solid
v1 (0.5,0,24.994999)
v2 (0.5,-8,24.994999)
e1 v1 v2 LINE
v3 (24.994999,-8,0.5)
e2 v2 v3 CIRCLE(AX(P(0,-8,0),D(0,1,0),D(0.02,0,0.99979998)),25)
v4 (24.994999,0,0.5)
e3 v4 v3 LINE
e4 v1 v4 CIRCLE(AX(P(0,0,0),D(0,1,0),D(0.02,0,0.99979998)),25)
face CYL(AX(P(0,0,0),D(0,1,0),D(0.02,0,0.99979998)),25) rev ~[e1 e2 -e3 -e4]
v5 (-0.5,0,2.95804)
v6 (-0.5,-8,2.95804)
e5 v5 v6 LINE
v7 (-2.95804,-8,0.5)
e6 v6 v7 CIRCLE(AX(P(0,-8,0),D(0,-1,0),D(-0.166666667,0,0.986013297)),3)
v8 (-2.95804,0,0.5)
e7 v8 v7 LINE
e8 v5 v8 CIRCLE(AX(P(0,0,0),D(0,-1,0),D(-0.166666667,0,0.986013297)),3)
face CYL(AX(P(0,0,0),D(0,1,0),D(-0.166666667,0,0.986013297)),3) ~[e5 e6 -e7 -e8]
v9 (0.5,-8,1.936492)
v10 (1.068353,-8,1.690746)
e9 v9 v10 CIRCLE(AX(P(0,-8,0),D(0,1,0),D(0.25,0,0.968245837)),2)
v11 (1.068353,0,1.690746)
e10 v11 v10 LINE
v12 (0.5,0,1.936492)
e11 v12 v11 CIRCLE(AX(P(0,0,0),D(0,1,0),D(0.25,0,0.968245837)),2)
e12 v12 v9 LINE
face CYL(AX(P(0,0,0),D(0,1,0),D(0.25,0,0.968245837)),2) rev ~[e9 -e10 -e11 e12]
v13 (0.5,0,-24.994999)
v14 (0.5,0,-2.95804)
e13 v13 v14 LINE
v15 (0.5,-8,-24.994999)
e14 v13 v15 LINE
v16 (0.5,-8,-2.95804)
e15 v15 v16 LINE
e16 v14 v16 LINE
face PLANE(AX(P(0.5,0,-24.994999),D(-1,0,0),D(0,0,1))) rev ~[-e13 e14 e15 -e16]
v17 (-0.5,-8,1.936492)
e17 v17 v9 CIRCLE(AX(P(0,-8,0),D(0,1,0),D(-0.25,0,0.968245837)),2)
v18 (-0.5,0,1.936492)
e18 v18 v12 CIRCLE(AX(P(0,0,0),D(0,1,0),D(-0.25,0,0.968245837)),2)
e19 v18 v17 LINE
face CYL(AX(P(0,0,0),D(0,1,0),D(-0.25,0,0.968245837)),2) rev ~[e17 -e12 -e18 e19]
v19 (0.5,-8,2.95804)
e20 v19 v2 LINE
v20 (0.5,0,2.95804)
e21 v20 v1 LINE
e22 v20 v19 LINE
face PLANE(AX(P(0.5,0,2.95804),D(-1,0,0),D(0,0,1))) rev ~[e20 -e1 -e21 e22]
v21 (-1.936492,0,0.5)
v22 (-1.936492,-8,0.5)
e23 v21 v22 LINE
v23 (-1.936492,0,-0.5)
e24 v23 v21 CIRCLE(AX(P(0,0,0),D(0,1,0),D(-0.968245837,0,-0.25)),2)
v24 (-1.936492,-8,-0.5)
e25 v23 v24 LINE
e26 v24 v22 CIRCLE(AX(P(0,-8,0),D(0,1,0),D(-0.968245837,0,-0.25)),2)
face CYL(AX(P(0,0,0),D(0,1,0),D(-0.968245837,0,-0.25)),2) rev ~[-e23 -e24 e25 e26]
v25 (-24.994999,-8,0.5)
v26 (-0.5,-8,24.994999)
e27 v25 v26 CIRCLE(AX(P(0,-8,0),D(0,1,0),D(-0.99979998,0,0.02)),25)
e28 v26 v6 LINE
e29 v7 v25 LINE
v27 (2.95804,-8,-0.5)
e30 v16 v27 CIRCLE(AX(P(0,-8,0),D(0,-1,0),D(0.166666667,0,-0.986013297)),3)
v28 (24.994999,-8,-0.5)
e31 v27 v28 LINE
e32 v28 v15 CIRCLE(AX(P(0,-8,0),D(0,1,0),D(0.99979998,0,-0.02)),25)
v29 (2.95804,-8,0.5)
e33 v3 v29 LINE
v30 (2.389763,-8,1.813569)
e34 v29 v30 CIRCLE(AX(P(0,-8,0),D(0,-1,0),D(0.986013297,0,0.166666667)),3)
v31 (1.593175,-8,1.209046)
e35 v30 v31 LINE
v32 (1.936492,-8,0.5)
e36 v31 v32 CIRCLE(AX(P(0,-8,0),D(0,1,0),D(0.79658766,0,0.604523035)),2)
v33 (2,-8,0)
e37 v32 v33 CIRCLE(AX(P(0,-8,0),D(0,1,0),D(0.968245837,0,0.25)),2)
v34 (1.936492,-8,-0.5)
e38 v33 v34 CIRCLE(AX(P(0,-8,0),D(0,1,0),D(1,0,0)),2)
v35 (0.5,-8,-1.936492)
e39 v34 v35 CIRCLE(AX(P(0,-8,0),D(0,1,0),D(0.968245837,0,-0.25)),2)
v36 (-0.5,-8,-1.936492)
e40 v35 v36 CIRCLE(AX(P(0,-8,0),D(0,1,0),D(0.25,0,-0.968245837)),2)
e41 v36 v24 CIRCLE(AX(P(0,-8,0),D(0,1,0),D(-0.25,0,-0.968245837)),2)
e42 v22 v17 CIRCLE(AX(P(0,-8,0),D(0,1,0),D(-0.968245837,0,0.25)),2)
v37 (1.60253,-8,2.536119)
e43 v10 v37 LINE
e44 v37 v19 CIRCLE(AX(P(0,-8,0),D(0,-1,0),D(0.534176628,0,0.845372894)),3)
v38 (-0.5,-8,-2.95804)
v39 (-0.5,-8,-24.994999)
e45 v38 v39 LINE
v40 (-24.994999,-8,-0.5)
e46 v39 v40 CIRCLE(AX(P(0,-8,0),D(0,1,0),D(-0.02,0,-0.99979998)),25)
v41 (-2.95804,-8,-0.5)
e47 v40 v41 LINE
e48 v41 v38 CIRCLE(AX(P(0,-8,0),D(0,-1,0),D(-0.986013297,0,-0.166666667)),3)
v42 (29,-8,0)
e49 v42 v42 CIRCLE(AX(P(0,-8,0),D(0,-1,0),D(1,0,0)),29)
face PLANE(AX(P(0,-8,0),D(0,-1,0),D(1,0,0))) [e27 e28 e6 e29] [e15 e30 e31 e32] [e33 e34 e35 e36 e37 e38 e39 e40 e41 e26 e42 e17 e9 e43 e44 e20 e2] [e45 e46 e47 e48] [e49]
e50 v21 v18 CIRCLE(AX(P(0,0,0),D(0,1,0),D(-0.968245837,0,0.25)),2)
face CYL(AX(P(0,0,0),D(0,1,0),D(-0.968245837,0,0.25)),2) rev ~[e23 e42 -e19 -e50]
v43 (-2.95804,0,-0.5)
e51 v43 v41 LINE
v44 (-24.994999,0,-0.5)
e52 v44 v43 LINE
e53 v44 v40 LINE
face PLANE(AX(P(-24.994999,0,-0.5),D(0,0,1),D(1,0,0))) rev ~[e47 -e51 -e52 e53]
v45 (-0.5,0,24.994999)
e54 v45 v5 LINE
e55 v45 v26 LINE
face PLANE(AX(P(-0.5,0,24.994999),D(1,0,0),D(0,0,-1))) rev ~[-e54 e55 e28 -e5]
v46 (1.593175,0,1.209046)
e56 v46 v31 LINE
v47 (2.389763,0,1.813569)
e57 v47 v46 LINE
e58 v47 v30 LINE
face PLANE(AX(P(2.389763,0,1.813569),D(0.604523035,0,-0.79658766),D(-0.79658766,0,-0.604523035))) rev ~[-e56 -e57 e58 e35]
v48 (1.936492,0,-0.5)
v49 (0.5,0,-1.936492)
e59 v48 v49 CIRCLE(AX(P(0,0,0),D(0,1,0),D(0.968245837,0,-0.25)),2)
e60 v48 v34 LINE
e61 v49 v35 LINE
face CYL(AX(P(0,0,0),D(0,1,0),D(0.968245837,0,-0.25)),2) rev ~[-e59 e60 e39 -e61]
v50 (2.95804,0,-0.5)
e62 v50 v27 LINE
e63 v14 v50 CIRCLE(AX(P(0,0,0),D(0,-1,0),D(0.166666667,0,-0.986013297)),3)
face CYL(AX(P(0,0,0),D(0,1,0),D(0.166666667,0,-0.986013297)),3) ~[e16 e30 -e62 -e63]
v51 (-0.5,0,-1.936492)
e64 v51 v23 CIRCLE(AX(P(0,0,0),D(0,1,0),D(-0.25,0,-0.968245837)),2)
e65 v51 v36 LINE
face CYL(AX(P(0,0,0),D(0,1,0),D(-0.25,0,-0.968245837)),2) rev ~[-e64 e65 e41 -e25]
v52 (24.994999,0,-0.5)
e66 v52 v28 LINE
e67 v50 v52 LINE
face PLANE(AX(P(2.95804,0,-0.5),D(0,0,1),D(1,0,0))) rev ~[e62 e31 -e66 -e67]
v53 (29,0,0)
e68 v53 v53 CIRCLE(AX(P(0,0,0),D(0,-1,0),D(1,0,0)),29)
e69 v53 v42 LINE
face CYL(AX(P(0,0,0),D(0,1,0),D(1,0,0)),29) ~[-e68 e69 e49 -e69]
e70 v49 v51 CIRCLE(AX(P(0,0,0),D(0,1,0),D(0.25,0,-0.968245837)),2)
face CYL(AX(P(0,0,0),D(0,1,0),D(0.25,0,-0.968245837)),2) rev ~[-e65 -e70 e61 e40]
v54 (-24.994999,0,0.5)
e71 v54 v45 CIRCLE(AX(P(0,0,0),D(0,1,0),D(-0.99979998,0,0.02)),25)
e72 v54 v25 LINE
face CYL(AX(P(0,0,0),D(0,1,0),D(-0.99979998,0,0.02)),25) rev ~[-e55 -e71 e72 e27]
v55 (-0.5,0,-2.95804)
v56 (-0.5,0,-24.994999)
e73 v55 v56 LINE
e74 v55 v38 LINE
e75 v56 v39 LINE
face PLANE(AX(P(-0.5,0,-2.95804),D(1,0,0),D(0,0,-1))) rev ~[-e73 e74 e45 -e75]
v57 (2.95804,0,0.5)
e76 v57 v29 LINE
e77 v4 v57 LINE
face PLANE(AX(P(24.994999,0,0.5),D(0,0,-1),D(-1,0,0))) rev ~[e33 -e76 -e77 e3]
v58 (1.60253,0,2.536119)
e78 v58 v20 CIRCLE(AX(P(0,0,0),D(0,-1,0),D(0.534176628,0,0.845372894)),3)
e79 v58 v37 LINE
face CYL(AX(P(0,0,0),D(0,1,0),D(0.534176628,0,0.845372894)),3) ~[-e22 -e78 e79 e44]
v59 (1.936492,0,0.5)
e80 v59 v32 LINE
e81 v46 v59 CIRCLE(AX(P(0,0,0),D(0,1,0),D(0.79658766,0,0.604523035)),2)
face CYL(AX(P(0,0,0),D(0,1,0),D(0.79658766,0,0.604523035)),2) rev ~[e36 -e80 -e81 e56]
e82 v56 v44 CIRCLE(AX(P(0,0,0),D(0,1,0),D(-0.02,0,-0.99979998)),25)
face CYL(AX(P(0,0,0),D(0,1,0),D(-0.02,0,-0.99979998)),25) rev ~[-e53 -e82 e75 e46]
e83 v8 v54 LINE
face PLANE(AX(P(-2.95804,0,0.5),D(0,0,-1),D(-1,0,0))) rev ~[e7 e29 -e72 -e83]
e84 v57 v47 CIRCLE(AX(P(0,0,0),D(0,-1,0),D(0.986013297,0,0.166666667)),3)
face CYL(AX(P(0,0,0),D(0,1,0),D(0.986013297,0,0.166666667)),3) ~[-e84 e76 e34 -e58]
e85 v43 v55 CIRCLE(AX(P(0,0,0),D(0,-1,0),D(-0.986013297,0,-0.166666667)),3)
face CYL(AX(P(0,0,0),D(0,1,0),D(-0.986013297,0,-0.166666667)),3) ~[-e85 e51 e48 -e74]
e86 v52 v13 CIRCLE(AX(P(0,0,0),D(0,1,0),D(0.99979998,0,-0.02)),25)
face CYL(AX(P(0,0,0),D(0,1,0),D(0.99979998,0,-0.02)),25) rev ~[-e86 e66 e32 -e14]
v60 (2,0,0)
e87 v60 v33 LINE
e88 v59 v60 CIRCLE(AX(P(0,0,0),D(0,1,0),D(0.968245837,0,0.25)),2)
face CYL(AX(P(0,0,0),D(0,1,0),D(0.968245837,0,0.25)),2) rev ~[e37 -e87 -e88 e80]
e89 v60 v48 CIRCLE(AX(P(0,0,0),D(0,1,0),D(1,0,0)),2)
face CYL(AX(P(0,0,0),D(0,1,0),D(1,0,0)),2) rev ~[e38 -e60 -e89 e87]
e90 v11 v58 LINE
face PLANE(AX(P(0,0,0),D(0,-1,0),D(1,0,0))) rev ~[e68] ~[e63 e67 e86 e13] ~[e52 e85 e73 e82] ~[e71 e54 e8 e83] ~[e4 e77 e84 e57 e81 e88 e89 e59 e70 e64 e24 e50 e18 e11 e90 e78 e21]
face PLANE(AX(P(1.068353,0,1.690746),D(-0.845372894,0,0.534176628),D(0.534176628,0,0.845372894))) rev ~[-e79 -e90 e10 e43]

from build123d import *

# Parameters (mm, degrees)
F0_R     = 29
F1_DEPTH = 8


with BuildPart() as f1:
    # F0 (on Front) → F1 (new body)
    with BuildSketch(Plane.XZ):
        Circle(F0_R)
        with BuildLine():
            ThreePointArc((0.5, 24.9949994999), (17.6776695297, 17.6776695297), (24.9949994999, 0.5))
            ThreePointArc((24.9949994999, 0.5), (24.9987498437, 0.2500125022), (25, 0))
            ThreePointArc((25, 0), (24.9987498437, -0.2500125022), (24.9949994999, -0.5))
            ThreePointArc((24.9949994999, -0.5), (17.6776695297, -17.6776695297), (0.5, -24.9949994999))
            ThreePointArc((0.5, -24.9949994999), (0, -25), (-0.5, -24.9949994999))
            ThreePointArc((-0.5, -24.9949994999), (-17.6776695297, -17.6776695297), (-24.9949994999, -0.5))
            ThreePointArc((-24.9949994999, -0.5), (-25, 0), (-24.9949994999, 0.5))
            ThreePointArc((-24.9949994999, 0.5), (-17.6776695297, 17.6776695297), (-0.5, 24.9949994999))
            ThreePointArc((-0.5, 24.9949994999), (0, 25), (0.5, 24.9949994999))
        make_face(mode=Mode.SUBTRACT)
        with BuildLine():
            ThreePointArc((1.9364916731, 0.5), (1.9840593925, 0.252008585), (2, 0))
            ThreePointArc((2, 0), (1.9840593925, -0.252008585), (1.9364916731, -0.5))
            Line((1.9364916731, -0.5), (2.9580398915, -0.5))
            ThreePointArc((2.9580398915, -0.5), (2.9894915684, -0.2508787808), (3, 0))
            ThreePointArc((3, 0), (2.9894915684, 0.2508787808), (2.9580398915, 0.5))
            Line((2.9580398915, 0.5), (1.9364916731, 0.5))
        make_face()
        with BuildLine():
            ThreePointArc((1.5931753199, 1.2090460702), (1.8000899569, 0.8715940265), (1.9364916731, 0.5))
            Line((1.9364916731, 0.5), (2.9580398915, 0.5))
            ThreePointArc((2.9580398915, 0.5), (2.7533824356, 1.1911696619), (2.3897629799, 1.8135691053))
            Line((2.3897629799, 1.8135691053), (1.5931753199, 1.2090460702))
        make_face()
        with BuildLine():
            Line((2.9580398915, -0.5), (1.9364916731, -0.5))
            ThreePointArc((1.9364916731, -0.5), (1.4142135624, -1.4142135624), (0.5, -1.9364916731))
            Line((0.5, -1.9364916731), (0.5, -2.9580398915))
            ThreePointArc((0.5, -2.9580398915), (2.1213203436, -2.1213203436), (2.9580398915, -0.5))
        make_face()
        with BuildLine():
            Line((24.9949994999, 0.5), (2.9580398915, 0.5))
            ThreePointArc((2.9580398915, 0.5), (2.9894915684, 0.2508787808), (3, 0))
            ThreePointArc((3, 0), (2.9894915684, -0.2508787808), (2.9580398915, -0.5))
            Line((2.9580398915, -0.5), (24.9949994999, -0.5))
            ThreePointArc((24.9949994999, -0.5), (24.9987498437, -0.2500125022), (25, 0))
            ThreePointArc((25, 0), (24.9987498437, 0.2500125022), (24.9949994999, 0.5))
        make_face()
        with BuildLine():
            Line((0.5, -2.9580398915), (0.5, -1.9364916731))
            ThreePointArc((0.5, -1.9364916731), (0, -2), (-0.5, -1.9364916731))
            Line((-0.5, -1.9364916731), (-0.5, -2.9580398915))
            ThreePointArc((-0.5, -2.9580398915), (0, -3), (0.5, -2.9580398915))
        make_face()
        with BuildLine():
            ThreePointArc((0.5, 1.9364916731), (0.7937447605, 1.8357476012), (1.068353257, 1.6907457876))
            Line((1.068353257, 1.6907457876), (1.6025298855, 2.5361186814))
            ThreePointArc((1.6025298855, 2.5361186814), (1.0722230909, 2.8018453996), (0.5, 2.9580398915))
            Line((0.5, 2.9580398915), (0.5, 1.9364916731))
        make_face()
        with BuildLine():
            Line((-0.5, -2.9580398915), (-0.5, -1.9364916731))
            ThreePointArc((-0.5, -1.9364916731), (-1.4142135624, -1.4142135624), (-1.9364916731, -0.5))
            Line((-1.9364916731, -0.5), (-2.9580398915, -0.5))
            ThreePointArc((-2.9580398915, -0.5), (-2.1213203436, -2.1213203436), (-0.5, -2.9580398915))
        make_face()
        with BuildLine():
            Line((0.5, -24.9949994999), (0.5, -2.9580398915))
            ThreePointArc((0.5, -2.9580398915), (0, -3), (-0.5, -2.9580398915))
            Line((-0.5, -2.9580398915), (-0.5, -24.9949994999))
            ThreePointArc((-0.5, -24.9949994999), (0, -25), (0.5, -24.9949994999))
        make_face()
        with BuildLine():
            ThreePointArc((-0.5, 1.9364916731), (0, 2), (0.5, 1.9364916731))
            Line((0.5, 1.9364916731), (0.5, 2.9580398915))
            ThreePointArc((0.5, 2.9580398915), (0, 3), (-0.5, 2.9580398915))
            Line((-0.5, 2.9580398915), (-0.5, 1.9364916731))
        make_face()
        with BuildLine():
            Line((0.5, 2.9580398915), (0.5, 24.9949994999))
            ThreePointArc((0.5, 24.9949994999), (0, 25), (-0.5, 24.9949994999))
            Line((-0.5, 24.9949994999), (-0.5, 2.9580398915))
            ThreePointArc((-0.5, 2.9580398915), (0, 3), (0.5, 2.9580398915))
        make_face()
        with BuildLine():
            Line((-2.9580398915, -0.5), (-1.9364916731, -0.5))
            ThreePointArc((-1.9364916731, -0.5), (-2, 0), (-1.9364916731, 0.5))
            Line((-1.9364916731, 0.5), (-2.9580398915, 0.5))
            ThreePointArc((-2.9580398915, 0.5), (-3, 0), (-2.9580398915, -0.5))
        make_face()
        with BuildLine():
            ThreePointArc((-1.9364916731, 0.5), (-1.4142135624, 1.4142135624), (-0.5, 1.9364916731))
            Line((-0.5, 1.9364916731), (-0.5, 2.9580398915))
            ThreePointArc((-0.5, 2.9580398915), (-2.1213203436, 2.1213203436), (-2.9580398915, 0.5))
            Line((-2.9580398915, 0.5), (-1.9364916731, 0.5))
        make_face()
        with BuildLine():
            Line((-24.9949994999, -0.5), (-2.9580398915, -0.5))
            ThreePointArc((-2.9580398915, -0.5), (-3, 0), (-2.9580398915, 0.5))
            Line((-2.9580398915, 0.5), (-24.9949994999, 0.5))
            ThreePointArc((-24.9949994999, 0.5), (-25, 0), (-24.9949994999, -0.5))
        make_face()
    extrude(amount=F1_DEPTH)


solid = f1.part
